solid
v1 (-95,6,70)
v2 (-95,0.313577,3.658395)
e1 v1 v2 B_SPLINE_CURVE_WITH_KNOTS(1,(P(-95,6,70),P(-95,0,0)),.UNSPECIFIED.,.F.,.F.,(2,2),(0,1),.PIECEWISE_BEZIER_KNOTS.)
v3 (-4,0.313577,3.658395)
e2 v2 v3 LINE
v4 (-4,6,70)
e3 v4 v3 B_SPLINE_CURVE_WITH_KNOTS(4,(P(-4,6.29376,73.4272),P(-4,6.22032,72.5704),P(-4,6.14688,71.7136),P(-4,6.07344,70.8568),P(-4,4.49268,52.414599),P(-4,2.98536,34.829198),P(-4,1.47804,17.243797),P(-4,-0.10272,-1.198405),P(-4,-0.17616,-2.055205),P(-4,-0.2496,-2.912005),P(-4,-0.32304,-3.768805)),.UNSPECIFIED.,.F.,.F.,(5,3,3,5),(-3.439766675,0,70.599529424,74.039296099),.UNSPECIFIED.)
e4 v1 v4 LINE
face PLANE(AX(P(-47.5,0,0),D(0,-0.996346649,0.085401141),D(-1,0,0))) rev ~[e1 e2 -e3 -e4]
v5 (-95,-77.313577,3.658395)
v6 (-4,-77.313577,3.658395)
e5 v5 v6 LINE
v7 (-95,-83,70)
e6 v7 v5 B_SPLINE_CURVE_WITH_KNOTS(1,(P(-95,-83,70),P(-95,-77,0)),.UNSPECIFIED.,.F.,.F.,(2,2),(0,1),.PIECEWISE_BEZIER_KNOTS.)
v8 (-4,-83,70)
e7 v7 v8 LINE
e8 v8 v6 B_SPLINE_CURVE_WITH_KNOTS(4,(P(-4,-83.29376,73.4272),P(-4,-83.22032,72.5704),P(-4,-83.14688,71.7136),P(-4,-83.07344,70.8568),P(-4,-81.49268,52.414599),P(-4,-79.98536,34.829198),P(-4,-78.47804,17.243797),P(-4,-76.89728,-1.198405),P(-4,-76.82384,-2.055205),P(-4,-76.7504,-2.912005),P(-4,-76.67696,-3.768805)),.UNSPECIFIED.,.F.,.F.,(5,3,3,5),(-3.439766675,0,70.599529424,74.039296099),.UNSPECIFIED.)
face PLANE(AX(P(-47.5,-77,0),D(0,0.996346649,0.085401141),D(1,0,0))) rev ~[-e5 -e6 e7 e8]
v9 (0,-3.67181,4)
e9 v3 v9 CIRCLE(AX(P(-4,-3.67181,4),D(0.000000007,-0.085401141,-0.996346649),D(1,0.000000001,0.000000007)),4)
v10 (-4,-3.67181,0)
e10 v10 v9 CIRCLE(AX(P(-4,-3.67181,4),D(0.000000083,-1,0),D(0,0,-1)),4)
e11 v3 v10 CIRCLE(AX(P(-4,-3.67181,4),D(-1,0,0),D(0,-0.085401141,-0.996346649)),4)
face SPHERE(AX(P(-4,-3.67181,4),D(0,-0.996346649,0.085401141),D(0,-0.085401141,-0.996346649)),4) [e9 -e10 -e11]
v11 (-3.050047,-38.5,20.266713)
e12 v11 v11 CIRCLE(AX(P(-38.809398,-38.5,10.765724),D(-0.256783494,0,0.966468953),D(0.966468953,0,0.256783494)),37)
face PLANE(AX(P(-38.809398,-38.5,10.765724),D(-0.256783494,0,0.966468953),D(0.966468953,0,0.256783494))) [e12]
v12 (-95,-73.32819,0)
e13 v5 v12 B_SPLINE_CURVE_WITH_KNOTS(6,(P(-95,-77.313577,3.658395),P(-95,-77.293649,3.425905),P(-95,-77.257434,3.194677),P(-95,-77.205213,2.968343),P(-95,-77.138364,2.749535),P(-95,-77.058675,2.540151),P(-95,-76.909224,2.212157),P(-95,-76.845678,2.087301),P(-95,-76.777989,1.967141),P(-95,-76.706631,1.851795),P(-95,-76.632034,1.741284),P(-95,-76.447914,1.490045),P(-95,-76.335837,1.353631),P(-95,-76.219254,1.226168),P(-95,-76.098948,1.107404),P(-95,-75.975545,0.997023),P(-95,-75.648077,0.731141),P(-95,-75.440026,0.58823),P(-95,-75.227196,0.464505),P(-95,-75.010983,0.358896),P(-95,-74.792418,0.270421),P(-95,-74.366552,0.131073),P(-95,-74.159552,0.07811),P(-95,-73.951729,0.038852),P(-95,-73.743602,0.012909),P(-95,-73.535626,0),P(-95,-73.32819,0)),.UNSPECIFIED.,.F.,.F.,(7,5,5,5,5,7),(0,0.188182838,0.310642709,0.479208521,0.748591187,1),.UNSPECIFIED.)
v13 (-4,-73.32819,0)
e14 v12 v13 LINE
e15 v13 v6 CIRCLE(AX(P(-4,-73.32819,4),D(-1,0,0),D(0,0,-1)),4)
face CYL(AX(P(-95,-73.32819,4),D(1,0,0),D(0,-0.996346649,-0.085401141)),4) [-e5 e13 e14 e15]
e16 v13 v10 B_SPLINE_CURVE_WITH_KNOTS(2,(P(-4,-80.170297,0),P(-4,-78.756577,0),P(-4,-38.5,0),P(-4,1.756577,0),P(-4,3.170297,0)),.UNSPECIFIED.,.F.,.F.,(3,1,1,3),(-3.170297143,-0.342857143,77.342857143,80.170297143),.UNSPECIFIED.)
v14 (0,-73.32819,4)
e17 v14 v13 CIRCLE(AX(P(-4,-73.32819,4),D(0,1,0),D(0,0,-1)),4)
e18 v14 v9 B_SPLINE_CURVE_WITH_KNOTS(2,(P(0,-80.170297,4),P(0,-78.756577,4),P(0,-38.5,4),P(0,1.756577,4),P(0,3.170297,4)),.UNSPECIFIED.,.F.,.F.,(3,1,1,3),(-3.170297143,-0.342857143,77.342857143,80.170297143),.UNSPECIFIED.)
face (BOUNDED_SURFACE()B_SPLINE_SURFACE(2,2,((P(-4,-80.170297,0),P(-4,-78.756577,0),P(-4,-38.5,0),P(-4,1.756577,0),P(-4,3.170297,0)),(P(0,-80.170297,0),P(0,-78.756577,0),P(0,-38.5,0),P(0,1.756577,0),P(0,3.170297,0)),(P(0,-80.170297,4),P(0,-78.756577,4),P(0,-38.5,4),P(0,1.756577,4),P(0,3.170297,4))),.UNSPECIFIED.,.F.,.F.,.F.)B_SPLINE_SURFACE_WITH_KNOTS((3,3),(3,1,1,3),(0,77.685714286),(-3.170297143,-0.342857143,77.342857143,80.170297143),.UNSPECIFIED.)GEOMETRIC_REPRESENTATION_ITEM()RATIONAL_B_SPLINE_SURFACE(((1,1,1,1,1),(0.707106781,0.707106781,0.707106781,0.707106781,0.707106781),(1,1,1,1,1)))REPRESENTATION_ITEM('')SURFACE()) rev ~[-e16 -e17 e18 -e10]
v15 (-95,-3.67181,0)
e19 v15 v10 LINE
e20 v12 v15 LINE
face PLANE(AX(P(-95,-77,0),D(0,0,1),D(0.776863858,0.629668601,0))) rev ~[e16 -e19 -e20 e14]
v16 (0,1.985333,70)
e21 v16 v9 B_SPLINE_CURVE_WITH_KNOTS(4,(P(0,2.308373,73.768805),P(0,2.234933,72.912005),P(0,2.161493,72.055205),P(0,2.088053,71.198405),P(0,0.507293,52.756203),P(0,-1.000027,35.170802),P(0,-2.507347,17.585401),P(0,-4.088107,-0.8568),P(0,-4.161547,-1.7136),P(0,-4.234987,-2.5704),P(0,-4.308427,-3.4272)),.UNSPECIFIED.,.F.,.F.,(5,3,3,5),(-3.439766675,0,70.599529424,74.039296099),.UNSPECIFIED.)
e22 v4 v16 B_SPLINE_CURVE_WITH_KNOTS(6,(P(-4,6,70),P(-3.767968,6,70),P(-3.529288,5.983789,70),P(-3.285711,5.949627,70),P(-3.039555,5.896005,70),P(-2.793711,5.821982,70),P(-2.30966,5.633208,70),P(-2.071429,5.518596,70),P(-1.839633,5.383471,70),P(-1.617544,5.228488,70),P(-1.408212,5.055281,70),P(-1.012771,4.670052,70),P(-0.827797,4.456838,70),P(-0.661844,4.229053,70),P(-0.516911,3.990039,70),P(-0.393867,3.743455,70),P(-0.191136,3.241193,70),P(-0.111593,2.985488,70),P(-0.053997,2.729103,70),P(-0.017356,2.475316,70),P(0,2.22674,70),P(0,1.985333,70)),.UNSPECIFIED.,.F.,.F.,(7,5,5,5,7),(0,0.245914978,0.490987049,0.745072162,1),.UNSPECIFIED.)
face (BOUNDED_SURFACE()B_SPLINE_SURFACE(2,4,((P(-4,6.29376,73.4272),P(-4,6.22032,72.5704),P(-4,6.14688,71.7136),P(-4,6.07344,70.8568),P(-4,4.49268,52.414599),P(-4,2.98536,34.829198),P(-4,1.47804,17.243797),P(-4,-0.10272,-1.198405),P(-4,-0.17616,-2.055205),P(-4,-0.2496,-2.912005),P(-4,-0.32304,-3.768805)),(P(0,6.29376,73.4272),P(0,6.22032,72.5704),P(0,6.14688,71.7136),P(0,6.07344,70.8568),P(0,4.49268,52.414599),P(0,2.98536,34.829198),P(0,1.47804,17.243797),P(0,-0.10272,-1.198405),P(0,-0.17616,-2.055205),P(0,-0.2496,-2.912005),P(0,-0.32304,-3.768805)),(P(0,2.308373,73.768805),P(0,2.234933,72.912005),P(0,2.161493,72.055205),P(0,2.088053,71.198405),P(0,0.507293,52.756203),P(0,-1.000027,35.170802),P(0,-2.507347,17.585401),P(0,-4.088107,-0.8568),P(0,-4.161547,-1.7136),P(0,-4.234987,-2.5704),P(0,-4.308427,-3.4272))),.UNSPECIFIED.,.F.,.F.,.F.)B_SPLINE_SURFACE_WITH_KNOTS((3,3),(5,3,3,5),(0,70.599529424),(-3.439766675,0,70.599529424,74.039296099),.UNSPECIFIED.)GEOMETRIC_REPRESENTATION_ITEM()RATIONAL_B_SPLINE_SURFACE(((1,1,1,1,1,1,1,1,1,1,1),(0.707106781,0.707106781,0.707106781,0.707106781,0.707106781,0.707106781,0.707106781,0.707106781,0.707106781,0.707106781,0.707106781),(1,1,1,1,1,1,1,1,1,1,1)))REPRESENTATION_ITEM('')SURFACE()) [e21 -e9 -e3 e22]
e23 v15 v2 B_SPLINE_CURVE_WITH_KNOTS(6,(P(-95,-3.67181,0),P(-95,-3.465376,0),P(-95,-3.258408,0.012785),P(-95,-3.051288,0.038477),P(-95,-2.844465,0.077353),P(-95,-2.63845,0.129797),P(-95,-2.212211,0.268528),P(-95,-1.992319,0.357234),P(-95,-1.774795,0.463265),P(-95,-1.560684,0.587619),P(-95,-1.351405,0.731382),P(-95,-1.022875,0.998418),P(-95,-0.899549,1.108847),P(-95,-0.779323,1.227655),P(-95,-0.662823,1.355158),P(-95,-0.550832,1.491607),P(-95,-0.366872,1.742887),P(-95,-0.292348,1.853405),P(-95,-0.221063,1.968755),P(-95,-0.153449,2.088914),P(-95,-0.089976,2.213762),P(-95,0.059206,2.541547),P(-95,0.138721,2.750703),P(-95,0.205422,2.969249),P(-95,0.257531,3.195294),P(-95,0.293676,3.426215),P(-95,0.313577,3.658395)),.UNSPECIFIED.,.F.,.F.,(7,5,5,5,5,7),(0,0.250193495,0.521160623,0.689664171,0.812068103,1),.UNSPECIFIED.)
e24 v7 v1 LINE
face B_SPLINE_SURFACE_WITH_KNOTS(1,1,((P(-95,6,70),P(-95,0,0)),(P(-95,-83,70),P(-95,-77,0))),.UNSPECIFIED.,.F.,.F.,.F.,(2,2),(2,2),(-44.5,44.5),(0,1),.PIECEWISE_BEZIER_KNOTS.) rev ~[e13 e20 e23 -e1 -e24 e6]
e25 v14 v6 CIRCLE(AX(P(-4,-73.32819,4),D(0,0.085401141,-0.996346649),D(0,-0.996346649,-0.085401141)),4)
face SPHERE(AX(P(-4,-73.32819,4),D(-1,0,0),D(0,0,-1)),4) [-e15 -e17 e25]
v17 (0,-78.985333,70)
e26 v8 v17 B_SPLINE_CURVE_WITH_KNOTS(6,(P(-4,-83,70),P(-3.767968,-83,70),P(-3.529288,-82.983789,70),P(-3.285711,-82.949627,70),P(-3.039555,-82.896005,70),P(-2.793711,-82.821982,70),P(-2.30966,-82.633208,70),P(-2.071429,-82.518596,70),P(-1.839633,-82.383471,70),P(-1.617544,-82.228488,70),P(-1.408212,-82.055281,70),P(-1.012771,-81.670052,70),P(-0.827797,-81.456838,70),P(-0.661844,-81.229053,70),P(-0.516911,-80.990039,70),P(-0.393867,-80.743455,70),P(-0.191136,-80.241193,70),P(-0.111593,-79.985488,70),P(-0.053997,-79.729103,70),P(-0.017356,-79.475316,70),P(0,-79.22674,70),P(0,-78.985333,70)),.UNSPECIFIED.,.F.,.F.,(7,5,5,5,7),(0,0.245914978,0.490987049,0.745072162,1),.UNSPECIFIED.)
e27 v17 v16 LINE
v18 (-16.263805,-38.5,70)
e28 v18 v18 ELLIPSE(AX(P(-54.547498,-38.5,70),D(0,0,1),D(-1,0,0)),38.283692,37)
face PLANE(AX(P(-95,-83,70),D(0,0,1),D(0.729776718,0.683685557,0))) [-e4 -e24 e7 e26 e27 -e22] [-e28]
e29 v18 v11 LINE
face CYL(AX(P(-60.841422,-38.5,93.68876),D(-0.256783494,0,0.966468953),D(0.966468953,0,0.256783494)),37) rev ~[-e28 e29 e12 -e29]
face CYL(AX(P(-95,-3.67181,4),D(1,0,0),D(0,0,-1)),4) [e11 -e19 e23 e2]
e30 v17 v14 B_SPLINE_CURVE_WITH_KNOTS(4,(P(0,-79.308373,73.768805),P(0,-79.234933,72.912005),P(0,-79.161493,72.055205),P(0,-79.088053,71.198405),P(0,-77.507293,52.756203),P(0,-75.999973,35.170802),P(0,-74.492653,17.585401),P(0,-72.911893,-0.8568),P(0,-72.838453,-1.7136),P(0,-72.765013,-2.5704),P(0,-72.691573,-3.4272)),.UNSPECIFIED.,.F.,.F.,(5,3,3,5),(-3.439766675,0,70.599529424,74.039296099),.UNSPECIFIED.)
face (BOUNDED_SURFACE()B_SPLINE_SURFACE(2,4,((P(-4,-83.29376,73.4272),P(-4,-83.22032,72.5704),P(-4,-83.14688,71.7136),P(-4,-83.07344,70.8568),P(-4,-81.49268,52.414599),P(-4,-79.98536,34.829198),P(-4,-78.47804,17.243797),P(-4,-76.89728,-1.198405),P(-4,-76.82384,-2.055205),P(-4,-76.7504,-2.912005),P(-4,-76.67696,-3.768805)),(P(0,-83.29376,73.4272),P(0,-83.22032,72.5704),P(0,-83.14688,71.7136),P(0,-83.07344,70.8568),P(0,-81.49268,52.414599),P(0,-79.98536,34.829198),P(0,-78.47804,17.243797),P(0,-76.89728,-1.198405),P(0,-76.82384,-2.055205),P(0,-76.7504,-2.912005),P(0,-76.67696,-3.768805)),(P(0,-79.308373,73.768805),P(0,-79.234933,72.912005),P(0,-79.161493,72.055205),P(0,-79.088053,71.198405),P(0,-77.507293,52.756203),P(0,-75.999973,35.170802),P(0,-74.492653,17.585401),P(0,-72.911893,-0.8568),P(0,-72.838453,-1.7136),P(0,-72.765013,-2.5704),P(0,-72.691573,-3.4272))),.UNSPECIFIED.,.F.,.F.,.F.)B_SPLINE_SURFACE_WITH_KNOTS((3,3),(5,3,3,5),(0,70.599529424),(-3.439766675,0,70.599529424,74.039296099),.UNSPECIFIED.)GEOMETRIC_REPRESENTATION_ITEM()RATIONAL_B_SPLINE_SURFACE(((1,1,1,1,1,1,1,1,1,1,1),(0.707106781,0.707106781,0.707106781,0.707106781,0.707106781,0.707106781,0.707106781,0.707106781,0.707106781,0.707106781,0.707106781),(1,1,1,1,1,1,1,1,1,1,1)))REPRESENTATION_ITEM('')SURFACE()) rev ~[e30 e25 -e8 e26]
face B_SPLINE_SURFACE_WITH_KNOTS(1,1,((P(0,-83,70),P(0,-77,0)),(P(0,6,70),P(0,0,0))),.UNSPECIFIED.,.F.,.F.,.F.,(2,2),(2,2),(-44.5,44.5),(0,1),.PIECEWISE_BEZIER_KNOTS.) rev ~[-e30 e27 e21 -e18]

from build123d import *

# Parameters (mm, degrees)
F2_W     = 95
F2_H     = 89
F0_W     = 95
F0_H     = 77
F7_R     = 37
F8_DEPTH = 85.8
F9_R     = 4


# Not quite as in the source:
# - a feature names something its author has since deleted; it is built from what else it names


with BuildPart() as f3:
    # F2 (on offset) → F3 section 0
    with BuildSketch(Plane.XY.offset(70)):
        with Locations((-47.5, -38.5)):
            Rectangle(F2_W, F2_H)
    # F0 (on Top) → F3 section 1
    with BuildSketch(Plane.XY):
        with Locations((-47.5, -38.5)):
            Rectangle(F0_W, F0_H)
    loft()

    # F7 (on face) → F8 (cut)
    with BuildSketch(Plane(origin=(-27.2627936506, 0, 102.6103478024), x_dir=(0.966468953, 0, 0.2567834941), z_dir=(-0.2567834941, 0, 0.966468953))):
        with Locations((-34.7436182201, -38.5)):
            Circle(F7_R)
    extrude(amount=-F8_DEPTH, mode=Mode.SUBTRACT)

    # F9
    f9_edges = [f3.edges().sort_by_distance(p)[0] for p in [
        (-47.5, -77, 0),
        (0, -38.5, 0),
        (-47.5, 0, 0),
        (0, -80, 35),
        (0, 3, 35),
    ]]
    fillet(f9_edges, radius=F9_R)


solid = f3.part
